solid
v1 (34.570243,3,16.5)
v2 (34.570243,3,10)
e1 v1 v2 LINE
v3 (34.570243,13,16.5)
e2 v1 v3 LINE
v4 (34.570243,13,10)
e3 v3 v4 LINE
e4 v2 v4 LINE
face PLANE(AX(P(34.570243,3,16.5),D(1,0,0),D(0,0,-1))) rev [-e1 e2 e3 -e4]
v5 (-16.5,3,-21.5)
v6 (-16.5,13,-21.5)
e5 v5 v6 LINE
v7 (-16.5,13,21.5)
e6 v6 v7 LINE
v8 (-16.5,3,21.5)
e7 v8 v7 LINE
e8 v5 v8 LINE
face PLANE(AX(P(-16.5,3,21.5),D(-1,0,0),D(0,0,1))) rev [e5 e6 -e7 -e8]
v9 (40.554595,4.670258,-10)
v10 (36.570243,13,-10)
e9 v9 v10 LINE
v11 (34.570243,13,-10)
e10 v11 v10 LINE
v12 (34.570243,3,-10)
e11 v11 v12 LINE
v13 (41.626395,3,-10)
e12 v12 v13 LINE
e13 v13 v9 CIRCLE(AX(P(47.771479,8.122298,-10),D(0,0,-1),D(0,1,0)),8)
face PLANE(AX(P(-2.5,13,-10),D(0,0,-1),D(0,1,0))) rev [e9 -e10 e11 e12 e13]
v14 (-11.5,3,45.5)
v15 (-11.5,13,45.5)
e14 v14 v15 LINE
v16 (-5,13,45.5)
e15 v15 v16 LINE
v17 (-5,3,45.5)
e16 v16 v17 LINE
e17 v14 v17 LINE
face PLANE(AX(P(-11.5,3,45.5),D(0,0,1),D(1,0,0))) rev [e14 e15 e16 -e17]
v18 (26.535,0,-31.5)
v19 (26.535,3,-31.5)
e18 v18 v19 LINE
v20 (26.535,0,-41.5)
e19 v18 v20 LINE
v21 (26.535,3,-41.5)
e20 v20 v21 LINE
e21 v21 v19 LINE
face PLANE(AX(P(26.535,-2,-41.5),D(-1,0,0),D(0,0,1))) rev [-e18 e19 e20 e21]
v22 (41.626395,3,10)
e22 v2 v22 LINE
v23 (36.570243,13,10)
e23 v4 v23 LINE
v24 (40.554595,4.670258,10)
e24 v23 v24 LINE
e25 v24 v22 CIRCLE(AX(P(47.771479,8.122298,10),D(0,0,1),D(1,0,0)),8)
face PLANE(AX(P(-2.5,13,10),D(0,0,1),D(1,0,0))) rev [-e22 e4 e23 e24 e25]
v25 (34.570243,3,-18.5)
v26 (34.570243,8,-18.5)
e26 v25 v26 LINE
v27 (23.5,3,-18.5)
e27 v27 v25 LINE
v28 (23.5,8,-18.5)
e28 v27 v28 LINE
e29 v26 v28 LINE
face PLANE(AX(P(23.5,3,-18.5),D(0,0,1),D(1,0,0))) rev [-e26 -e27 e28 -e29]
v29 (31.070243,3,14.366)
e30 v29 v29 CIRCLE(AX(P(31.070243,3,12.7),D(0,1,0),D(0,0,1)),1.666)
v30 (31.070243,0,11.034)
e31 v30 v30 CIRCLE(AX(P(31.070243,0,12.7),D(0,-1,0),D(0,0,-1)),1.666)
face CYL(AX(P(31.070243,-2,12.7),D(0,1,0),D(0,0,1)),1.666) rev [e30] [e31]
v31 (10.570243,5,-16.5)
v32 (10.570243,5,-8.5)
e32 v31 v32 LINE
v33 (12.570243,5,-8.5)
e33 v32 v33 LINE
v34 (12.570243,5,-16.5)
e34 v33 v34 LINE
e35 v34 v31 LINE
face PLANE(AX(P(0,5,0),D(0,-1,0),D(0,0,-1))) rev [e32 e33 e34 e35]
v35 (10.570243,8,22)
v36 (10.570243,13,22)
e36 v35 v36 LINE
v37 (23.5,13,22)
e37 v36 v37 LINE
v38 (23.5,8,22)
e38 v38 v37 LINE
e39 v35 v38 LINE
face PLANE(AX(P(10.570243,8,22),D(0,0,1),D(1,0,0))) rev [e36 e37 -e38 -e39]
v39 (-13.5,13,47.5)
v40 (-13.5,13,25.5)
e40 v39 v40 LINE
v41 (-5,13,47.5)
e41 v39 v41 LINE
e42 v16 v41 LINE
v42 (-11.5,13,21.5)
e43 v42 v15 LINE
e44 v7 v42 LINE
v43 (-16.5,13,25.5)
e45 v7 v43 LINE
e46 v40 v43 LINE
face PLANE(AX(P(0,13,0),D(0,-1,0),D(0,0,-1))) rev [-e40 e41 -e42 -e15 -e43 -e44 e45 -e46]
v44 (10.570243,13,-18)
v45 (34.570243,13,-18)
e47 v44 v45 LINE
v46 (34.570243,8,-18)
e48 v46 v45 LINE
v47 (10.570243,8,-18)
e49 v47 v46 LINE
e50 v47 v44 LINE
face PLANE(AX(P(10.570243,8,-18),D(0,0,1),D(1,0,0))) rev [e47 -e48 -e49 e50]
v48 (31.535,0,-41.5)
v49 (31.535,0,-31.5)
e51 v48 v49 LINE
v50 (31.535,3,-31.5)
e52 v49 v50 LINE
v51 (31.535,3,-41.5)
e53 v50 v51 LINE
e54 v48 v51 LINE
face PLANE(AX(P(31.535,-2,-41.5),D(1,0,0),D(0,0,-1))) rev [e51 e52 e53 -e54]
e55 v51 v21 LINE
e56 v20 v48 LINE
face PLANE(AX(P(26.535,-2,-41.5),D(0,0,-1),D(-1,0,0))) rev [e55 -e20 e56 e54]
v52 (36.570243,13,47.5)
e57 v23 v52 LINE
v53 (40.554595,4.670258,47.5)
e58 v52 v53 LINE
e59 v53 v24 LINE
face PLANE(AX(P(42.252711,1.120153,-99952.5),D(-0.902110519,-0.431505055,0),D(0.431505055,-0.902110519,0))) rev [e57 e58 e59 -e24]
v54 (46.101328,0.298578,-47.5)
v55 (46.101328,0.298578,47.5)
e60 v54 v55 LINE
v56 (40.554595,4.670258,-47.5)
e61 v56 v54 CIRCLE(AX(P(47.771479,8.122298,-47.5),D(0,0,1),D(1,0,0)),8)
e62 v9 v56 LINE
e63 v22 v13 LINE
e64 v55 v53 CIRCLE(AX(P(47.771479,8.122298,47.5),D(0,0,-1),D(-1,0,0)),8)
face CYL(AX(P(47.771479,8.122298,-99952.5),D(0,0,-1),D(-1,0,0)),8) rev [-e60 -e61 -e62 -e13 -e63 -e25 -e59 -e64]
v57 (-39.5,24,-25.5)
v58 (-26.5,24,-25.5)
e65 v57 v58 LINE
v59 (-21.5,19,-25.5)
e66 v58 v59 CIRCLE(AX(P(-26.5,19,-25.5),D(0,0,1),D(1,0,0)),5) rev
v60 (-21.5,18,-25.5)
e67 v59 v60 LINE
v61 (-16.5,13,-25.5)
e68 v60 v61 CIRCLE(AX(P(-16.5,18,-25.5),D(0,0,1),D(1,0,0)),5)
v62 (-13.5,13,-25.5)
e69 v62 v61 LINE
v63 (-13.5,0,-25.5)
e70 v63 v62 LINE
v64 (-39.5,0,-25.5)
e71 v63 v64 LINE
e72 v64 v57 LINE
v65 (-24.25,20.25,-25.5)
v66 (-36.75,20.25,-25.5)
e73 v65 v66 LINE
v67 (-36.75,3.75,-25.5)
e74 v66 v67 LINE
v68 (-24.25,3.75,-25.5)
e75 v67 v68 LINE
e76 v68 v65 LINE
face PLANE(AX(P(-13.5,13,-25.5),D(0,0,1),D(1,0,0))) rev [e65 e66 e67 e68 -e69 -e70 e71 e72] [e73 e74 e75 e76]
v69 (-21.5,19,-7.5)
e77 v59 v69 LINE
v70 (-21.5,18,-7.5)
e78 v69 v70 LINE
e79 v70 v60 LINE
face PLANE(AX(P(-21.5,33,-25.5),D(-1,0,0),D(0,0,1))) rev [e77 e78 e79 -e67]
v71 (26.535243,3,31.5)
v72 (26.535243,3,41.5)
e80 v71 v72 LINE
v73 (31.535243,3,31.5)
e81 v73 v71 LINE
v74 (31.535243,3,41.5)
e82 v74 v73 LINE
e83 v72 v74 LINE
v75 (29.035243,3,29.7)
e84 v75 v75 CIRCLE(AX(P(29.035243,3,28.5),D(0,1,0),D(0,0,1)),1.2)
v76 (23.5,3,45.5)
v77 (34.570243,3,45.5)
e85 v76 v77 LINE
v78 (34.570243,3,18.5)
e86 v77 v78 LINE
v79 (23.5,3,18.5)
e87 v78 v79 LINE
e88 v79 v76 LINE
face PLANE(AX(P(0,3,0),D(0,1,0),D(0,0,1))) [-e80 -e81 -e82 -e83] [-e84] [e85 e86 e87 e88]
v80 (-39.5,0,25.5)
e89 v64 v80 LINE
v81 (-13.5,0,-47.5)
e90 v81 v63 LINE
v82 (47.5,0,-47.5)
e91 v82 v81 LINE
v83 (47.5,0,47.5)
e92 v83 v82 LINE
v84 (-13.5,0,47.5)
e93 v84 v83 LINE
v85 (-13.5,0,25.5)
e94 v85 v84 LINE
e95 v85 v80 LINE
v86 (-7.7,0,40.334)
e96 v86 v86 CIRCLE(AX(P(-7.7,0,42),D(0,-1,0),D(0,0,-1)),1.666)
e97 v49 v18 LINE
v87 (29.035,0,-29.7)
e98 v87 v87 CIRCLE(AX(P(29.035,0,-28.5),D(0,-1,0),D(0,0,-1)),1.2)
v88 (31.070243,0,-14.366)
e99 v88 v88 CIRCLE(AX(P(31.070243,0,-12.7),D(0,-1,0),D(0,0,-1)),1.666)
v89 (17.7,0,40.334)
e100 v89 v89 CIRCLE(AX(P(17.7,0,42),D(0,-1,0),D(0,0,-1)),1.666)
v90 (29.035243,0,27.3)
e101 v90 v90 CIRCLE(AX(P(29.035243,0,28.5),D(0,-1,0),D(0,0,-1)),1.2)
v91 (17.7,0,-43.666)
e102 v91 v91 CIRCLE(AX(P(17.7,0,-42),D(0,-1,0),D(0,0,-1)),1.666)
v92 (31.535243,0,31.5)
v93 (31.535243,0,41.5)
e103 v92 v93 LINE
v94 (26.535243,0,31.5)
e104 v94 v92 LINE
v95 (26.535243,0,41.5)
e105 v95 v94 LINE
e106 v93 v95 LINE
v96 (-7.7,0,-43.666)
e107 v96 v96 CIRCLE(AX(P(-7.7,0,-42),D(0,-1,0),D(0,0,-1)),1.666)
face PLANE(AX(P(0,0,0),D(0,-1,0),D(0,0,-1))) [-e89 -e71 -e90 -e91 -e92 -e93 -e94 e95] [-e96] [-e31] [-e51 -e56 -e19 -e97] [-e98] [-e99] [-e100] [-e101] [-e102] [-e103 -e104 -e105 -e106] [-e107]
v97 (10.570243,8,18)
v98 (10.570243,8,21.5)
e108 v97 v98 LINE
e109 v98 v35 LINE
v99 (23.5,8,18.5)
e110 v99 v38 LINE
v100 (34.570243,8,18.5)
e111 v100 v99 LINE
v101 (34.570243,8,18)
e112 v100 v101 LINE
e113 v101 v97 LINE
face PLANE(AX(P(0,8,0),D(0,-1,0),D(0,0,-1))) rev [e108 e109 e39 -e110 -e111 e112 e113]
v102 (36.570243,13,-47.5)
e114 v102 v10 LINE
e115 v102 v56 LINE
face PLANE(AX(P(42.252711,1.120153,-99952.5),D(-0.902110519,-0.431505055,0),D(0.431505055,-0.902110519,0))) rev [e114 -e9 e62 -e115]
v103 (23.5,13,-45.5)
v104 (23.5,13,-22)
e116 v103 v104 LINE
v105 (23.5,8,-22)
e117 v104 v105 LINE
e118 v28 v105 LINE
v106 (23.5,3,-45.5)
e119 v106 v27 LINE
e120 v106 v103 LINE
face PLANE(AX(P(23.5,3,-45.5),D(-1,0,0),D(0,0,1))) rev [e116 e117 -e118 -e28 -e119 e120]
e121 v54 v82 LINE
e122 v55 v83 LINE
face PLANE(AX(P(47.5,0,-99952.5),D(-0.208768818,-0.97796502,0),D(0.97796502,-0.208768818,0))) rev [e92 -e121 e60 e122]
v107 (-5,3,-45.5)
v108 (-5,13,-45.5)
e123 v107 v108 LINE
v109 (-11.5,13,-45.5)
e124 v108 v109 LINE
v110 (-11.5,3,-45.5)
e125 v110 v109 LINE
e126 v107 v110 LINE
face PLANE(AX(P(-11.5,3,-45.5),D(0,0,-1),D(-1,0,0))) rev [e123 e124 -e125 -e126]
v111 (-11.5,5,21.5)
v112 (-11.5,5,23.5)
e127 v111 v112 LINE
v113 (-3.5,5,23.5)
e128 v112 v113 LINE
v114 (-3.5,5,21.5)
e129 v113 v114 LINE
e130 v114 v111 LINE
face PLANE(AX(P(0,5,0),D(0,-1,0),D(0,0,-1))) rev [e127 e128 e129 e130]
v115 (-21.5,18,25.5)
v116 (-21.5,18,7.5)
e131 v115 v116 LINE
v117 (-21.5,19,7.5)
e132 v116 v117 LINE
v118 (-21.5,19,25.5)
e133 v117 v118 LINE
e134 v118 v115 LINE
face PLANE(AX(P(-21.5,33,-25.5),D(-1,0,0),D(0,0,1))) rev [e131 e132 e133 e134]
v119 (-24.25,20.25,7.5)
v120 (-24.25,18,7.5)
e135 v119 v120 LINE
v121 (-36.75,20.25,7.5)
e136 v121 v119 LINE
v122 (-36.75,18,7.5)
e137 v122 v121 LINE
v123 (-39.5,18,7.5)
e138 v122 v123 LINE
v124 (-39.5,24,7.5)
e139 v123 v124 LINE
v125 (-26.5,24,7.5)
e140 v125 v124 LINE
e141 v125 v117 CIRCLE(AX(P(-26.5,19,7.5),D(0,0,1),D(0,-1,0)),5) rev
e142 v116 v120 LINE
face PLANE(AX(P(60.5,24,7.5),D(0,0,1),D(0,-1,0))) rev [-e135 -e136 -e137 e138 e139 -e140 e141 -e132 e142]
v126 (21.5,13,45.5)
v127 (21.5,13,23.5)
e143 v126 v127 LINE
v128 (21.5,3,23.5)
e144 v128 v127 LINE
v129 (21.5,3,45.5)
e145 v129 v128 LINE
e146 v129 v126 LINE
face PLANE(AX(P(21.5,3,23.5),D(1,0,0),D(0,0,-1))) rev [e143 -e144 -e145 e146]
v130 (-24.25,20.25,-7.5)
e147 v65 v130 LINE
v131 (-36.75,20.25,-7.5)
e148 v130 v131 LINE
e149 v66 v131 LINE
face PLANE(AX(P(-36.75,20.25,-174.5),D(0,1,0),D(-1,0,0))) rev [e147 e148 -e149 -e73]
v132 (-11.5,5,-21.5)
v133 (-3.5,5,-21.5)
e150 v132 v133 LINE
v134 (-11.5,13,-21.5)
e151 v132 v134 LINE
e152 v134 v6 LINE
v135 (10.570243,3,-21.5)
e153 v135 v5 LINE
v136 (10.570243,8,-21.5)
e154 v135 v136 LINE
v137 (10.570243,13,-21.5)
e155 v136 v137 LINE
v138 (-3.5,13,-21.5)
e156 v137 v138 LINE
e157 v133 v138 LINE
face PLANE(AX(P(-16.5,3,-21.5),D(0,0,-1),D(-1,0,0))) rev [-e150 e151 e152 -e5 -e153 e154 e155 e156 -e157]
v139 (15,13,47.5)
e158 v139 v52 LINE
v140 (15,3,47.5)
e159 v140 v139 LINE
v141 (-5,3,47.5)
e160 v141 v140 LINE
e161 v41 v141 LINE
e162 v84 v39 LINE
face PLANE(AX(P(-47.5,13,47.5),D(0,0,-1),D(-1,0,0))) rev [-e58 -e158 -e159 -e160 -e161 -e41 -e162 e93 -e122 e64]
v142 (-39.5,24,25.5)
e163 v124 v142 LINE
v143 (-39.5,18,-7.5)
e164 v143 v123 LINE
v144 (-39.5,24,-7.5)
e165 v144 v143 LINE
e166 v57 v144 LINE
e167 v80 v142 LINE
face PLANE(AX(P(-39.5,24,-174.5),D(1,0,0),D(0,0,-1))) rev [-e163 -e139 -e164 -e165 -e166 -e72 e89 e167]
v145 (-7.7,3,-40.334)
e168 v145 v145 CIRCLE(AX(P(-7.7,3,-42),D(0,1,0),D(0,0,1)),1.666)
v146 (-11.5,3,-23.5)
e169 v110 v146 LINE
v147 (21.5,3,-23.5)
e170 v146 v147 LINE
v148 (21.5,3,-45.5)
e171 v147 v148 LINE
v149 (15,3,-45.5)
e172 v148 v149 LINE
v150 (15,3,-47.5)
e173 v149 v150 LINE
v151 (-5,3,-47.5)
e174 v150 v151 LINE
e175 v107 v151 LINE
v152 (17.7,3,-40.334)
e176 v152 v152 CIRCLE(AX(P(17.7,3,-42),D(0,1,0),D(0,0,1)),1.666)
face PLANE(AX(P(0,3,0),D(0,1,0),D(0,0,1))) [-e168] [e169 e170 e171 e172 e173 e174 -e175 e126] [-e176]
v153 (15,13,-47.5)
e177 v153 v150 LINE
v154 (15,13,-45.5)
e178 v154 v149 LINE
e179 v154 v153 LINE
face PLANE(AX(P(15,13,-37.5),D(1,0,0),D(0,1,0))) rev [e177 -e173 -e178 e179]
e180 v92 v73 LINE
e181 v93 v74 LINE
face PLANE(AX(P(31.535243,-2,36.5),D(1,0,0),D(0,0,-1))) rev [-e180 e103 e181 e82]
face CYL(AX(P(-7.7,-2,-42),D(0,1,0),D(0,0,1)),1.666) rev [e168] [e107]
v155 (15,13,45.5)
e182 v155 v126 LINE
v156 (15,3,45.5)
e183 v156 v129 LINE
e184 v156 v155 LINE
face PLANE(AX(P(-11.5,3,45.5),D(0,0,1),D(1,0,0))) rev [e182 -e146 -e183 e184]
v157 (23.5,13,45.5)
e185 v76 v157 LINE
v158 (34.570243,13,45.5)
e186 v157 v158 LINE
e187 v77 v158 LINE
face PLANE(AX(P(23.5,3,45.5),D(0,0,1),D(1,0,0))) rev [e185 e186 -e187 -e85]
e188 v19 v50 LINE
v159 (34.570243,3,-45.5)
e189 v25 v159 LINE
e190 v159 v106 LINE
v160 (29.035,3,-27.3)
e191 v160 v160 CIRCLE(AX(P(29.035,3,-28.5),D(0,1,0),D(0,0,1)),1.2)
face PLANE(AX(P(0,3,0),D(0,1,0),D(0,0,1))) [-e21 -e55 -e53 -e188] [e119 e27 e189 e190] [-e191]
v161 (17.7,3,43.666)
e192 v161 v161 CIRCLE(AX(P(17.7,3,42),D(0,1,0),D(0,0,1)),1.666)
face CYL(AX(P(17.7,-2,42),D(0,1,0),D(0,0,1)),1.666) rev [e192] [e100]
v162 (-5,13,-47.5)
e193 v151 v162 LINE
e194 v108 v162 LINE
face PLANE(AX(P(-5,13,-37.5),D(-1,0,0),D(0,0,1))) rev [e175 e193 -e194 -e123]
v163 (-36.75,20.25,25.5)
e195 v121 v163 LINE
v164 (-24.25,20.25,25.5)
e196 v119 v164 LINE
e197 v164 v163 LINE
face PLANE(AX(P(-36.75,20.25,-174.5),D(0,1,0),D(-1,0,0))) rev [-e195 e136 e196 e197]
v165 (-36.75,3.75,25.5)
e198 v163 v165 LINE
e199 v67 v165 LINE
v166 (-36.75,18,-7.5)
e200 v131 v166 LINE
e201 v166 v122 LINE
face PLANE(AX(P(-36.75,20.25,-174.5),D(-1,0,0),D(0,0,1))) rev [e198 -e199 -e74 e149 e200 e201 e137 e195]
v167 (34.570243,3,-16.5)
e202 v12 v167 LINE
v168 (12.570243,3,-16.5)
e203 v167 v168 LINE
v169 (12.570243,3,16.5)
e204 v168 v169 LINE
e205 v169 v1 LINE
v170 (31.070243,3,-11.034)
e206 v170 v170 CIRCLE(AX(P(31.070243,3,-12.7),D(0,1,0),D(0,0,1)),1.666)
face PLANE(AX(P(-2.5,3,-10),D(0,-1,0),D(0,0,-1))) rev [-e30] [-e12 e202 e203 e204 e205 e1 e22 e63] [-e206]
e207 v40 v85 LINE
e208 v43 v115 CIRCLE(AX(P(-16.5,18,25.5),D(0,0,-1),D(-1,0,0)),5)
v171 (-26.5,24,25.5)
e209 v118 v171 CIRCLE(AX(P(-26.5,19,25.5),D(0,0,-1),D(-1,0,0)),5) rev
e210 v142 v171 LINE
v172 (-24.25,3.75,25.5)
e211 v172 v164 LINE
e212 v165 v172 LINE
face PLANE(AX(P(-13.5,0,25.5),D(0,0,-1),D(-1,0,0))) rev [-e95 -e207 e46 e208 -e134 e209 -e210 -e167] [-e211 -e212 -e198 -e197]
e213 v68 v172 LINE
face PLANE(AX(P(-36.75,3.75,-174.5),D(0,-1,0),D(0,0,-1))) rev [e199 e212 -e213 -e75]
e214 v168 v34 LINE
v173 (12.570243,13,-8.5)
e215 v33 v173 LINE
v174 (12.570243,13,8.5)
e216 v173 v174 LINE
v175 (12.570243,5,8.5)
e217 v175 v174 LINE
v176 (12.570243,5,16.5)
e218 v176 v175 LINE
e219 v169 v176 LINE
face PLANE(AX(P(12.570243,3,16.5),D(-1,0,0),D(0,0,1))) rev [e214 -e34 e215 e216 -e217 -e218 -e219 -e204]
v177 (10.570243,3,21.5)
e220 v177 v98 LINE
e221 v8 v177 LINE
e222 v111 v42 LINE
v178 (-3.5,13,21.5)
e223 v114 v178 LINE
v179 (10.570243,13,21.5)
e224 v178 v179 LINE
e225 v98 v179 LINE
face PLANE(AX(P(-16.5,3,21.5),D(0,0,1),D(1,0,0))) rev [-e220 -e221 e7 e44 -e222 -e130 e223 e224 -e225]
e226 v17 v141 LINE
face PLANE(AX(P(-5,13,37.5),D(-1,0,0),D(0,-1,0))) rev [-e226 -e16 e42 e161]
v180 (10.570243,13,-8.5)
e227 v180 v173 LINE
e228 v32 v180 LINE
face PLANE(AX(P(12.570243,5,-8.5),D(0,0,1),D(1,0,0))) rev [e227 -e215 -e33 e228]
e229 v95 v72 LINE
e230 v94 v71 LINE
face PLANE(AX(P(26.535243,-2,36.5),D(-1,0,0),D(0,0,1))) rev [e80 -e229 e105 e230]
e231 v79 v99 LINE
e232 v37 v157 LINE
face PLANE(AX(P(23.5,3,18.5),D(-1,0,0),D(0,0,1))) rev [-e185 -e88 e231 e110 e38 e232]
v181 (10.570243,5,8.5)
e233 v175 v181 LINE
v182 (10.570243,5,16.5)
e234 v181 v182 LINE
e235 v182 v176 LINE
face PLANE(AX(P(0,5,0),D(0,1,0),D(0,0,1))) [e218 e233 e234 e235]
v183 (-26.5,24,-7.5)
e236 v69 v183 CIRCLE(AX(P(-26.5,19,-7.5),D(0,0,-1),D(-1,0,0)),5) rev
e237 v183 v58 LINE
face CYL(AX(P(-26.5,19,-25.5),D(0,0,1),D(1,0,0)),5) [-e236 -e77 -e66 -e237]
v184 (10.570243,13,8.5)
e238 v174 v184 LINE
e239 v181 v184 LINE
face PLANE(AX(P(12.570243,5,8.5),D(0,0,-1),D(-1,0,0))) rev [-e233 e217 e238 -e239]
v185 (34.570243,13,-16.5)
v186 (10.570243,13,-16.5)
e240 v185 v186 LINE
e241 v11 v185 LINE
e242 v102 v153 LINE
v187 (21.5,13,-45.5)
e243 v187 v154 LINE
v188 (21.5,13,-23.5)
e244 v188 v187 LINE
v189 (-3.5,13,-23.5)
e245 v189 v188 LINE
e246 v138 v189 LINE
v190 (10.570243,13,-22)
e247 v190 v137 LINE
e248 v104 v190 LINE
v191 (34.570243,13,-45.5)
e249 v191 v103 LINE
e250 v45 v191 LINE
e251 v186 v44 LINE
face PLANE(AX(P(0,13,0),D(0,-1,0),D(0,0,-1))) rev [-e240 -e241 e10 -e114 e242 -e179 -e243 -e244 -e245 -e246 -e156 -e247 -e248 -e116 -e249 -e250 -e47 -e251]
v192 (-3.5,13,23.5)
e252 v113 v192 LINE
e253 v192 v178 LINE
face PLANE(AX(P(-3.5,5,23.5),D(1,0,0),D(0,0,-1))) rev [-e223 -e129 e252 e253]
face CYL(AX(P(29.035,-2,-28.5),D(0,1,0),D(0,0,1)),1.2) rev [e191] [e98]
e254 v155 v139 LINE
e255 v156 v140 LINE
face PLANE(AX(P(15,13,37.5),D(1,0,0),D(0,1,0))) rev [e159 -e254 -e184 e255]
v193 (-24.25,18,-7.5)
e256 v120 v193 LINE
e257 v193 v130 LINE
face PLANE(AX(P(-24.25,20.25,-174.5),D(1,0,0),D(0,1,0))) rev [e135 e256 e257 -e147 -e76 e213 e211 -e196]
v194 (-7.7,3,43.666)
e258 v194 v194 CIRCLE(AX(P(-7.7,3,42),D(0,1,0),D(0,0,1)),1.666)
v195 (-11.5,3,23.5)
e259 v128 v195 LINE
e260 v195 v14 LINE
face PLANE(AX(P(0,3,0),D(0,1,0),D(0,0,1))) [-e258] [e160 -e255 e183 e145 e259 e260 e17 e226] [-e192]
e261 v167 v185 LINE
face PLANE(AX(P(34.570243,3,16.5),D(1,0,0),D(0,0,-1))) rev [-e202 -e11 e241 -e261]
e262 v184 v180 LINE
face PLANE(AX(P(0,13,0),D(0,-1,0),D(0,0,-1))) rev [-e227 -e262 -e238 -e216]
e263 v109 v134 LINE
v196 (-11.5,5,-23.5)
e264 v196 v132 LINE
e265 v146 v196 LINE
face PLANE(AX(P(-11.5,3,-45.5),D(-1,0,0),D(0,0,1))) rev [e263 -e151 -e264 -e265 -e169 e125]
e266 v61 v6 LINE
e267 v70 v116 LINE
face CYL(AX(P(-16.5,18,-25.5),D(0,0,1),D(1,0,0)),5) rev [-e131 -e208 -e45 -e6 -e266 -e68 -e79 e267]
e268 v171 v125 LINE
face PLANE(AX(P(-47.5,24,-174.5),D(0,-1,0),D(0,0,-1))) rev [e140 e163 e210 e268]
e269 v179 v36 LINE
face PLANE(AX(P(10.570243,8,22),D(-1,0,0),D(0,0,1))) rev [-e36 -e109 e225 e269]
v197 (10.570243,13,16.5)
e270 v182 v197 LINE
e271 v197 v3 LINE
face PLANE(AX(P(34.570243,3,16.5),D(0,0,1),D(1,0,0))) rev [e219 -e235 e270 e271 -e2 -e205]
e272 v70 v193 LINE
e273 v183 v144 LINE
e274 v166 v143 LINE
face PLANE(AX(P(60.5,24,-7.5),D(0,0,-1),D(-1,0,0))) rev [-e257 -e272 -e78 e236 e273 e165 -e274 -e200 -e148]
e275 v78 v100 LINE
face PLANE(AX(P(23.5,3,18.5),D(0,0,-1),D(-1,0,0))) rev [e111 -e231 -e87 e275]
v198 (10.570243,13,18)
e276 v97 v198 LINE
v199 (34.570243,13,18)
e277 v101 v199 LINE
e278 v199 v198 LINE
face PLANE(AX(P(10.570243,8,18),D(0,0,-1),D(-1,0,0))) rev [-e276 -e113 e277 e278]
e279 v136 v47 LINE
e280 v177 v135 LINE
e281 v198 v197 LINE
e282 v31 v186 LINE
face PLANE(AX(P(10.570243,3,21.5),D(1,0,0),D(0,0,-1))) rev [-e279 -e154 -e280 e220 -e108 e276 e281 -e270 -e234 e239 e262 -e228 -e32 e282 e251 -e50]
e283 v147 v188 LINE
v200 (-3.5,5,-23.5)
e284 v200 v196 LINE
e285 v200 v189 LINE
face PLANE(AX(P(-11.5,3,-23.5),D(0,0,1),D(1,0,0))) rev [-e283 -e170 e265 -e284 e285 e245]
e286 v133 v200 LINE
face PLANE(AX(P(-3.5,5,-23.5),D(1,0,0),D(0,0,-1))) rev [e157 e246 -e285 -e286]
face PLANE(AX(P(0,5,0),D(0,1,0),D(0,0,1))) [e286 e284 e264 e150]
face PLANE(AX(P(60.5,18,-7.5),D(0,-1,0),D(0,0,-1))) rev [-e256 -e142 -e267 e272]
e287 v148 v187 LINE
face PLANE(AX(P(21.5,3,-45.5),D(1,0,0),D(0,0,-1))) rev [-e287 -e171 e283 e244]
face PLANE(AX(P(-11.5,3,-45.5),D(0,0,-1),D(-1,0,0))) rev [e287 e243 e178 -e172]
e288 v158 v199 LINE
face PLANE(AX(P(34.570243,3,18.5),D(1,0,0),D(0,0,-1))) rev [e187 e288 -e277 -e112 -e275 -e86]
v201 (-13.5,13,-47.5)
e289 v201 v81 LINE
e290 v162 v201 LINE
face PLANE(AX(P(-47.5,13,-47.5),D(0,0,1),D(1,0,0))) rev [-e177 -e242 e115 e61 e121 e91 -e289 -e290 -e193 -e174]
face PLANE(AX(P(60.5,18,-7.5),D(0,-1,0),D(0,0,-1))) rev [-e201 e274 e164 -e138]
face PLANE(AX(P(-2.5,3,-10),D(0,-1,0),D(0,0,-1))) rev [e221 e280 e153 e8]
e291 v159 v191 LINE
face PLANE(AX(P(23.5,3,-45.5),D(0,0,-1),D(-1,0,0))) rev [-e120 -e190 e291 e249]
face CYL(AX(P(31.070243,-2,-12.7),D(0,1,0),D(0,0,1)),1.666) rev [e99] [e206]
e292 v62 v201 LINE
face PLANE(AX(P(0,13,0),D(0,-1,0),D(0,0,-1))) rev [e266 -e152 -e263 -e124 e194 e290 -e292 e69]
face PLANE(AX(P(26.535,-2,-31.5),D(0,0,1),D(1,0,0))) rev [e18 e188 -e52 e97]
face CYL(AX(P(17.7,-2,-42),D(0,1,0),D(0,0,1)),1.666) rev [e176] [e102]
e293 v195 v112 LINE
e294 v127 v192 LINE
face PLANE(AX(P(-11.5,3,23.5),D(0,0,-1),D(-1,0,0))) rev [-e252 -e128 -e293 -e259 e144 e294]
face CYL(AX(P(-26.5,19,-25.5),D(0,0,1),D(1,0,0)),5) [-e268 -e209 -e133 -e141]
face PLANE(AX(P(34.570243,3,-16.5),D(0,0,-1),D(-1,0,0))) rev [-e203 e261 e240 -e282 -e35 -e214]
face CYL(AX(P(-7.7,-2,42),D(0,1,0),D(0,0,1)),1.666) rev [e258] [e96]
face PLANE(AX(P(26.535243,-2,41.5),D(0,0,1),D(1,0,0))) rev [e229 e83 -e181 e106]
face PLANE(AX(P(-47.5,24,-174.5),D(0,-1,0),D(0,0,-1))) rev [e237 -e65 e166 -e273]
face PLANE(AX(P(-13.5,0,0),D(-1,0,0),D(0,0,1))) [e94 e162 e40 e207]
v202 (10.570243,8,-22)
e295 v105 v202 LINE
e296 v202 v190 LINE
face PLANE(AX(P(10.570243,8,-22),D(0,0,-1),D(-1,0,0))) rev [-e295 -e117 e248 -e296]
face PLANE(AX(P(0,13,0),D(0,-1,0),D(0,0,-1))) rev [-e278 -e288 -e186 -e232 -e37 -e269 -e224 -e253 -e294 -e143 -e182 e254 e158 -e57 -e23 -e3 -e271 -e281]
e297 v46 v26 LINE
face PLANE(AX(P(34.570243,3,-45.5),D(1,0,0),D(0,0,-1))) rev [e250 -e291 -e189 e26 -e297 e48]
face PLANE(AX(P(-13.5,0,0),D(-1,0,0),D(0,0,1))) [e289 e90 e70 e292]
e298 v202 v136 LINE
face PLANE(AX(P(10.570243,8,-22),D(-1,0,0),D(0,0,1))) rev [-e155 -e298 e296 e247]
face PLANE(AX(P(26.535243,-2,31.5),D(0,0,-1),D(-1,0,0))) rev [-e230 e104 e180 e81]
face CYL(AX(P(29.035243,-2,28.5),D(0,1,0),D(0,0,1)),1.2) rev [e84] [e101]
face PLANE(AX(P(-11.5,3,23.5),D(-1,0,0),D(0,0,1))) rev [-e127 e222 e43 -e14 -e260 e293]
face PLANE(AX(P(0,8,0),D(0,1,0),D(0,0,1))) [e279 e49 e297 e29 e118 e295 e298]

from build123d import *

# Parameters (mm, degrees)
SKETCH1_W           = 95
SKETCH1_H           = 95
BOSS_EXTRUDE2_DEPTH = 13
SKETCH2_W           = 22
SKETCH2_H           = 13
CUT_EXTRUDE1_DEPTH  = 34
SKETCH3_W           = 22
SKETCH3_H           = 13
CUT_EXTRUDE2_DEPTH  = 34
SKETCH5_W           = 26
SKETCH5_H           = 51
BOSS_EXTRUDE3_DEPTH = 20
SKETCH6_W           = 12
SKETCH6_H           = 16
CUT_EXTRUDE4_DEPTH  = 200
SKETCH7_W           = 26
SKETCH7_H           = 9
CUT_EXTRUDE5_DEPTH  = 200
FILLET2_R           = 5
SKETCH8_W           = 8
SKETCH8_H           = 24
CUT_EXTRUDE6_DEPTH  = 200
SKETCH9_W           = 33
SKETCH9_H           = 22
CUT_EXTRUDE7_DEPTH  = 10
SKETCH10_W          = 20
SKETCH10_H          = 10
CUT_EXTRUDE10_DEPTH = 10
SKETCH13_W          = 33
SKETCH13_H          = 22
CUT_EXTRUDE11_DEPTH = 10
SKETCH14_W          = 20
SKETCH14_H          = 10
CUT_EXTRUDE12_DEPTH = 10
SKETCH18_W          = 20
SKETCH18_H          = 10
CUT_EXTRUDE16_DEPTH = 50
CUT_EXTRUDE17_DEPTH = 100000
SKETCH20_W          = 22
SKETCH20_H          = 33
CUT_EXTRUDE18_DEPTH = 10
SKETCH21_W          = 27.070242808
SKETCH21_H          = 43
CUT_EXTRUDE19_DEPTH = 10
SKETCH22_W          = 2
SKETCH22_H          = 20
BOSS_EXTRUDE4_DEPTH = 10
SKETCH23_W          = 12.5
SKETCH23_H          = 16.5
CUT_EXTRUDE20_DEPTH = 200
SKETCH24_W          = 8
SKETCH24_H          = 2
CUT_EXTRUDE21_DEPTH = 8
SKETCH25_W          = 8
SKETCH25_H          = 2
CUT_EXTRUDE22_DEPTH = 8
SKETCH26_W          = 2
SKETCH26_H          = 8
CUT_EXTRUDE24_DEPTH = 8
SKETCH27_W          = 2
SKETCH27_H          = 8
CUT_EXTRUDE25_DEPTH = 8
SKETCH28_W          = 11.070242808
SKETCH28_H          = 27
CUT_EXTRUDE26_DEPTH = 10
SKETCH29_W          = 11.070242808
SKETCH29_H          = 27
CUT_EXTRUDE27_DEPTH = 10
SKETCH30_W          = 24
SKETCH30_H          = 4
CUT_EXTRUDE29_DEPTH = 5
SKETCH31_W          = 24
SKETCH31_H          = 4
CUT_EXTRUDE30_DEPTH = 5
SKETCH32_W          = 5
SKETCH32_H          = 5
CUT_EXTRUDE32_DEPTH = 5
SKETCH40_W          = 5
SKETCH40_H          = 10
CUT_EXTRUDE39_DEPTH = 5
SKETCH41_R          = 1.2
CUT_EXTRUDE40_DEPTH = 5
SKETCH42_W          = 5
SKETCH42_H          = 5
CUT_EXTRUDE41_DEPTH = 5
SKETCH43_R          = 1.2
CUT_EXTRUDE42_DEPTH = 5
SKETCH44_R          = 1.666
CUT_EXTRUDE43_DEPTH = 5
SKETCH45_R          = 1.666
CUT_EXTRUDE44_DEPTH = 5
SKETCH46_R          = 1.666
CUT_EXTRUDE45_DEPTH = 5
FILLET6_R           = 8
SKETCH47_W          = 15
SKETCH47_H          = 6
CUT_EXTRUDE46_DEPTH = 100


with BuildPart() as part:
    # Sketch1 → Boss-Extrude2 (new body)
    with BuildSketch(Plane(origin=(0, 0, 0), x_dir=(1, 0, 0), z_dir=(0, 1, 0))):
        Rectangle(SKETCH1_W, SKETCH1_H)
    extrude(amount=BOSS_EXTRUDE2_DEPTH)

    # Sketch2 → Cut-Extrude1 (cut)
    with BuildSketch(Plane.ZY.offset(47.5)):
        with Locations((36.5, 6.5)):
            Rectangle(SKETCH2_W, SKETCH2_H)
    extrude(amount=-CUT_EXTRUDE1_DEPTH, mode=Mode.SUBTRACT)

    # Sketch3 → Cut-Extrude2 (cut)
    with BuildSketch(Plane.ZY.offset(47.5)):
        with Locations((-36.5, 6.5)):
            Rectangle(SKETCH3_W, SKETCH3_H)
    extrude(amount=-CUT_EXTRUDE2_DEPTH, mode=Mode.SUBTRACT)

    # Sketch5 → Boss-Extrude3 (add)
    with BuildSketch(Plane(origin=(0, 13, 0), x_dir=(1, 0, 0), z_dir=(0, 1, 0))):
        with Locations((-34.5, 0)):
            Rectangle(SKETCH5_W, SKETCH5_H)
    extrude(amount=BOSS_EXTRUDE3_DEPTH)

    # Sketch6 → Cut-Extrude4 (cut)
    with BuildSketch(Plane.XY.offset(25.5)):
        with Locations((-30.5, 12)):
            Rectangle(SKETCH6_W, SKETCH6_H)
    extrude(amount=-CUT_EXTRUDE4_DEPTH, mode=Mode.SUBTRACT)

    # Sketch7 → Cut-Extrude5 (cut)
    with BuildSketch(Plane.XY.offset(25.5)):
        with Locations((-34.5, 28.5)):
            Rectangle(SKETCH7_W, SKETCH7_H)
    extrude(amount=-CUT_EXTRUDE5_DEPTH, mode=Mode.SUBTRACT)

    # Fillet2
    fillet2_edges = [part.edges().sort_by_distance(p)[0] for p in [
        (-21.5, 24, 0),
        (-21.5, 13, 0),
    ]]
    fillet(fillet2_edges, radius=FILLET2_R)

    # Sketch8 → Cut-Extrude6 (cut)
    with BuildSketch(Plane.XY.offset(25.5)):
        with Locations((-43.5, 12)):
            Rectangle(SKETCH8_W, SKETCH8_H)
    extrude(amount=-CUT_EXTRUDE6_DEPTH, mode=Mode.SUBTRACT)

    # Sketch9 → Cut-Extrude7 (cut)
    with BuildSketch(Plane(origin=(0, 13, 0), x_dir=(1, 0, 0), z_dir=(0, 1, 0))):
        with Locations((5, -34.5)):
            Rectangle(SKETCH9_W, SKETCH9_H)
    extrude(amount=-CUT_EXTRUDE7_DEPTH, mode=Mode.SUBTRACT)

    # Sketch10 → Cut-Extrude10 (cut)
    with BuildSketch(Plane.XY.offset(47.5)):
        with Locations((5, 8)):
            Rectangle(SKETCH10_W, SKETCH10_H)
    extrude(amount=-CUT_EXTRUDE10_DEPTH, mode=Mode.SUBTRACT)

    # Sketch13 → Cut-Extrude11 (cut)
    with BuildSketch(Plane(origin=(0, 13, 0), x_dir=(1, 0, 0), z_dir=(0, 1, 0))):
        with Locations((5, 34.5)):
            Rectangle(SKETCH13_W, SKETCH13_H)
    extrude(amount=-CUT_EXTRUDE11_DEPTH, mode=Mode.SUBTRACT)

    # Sketch14 → Cut-Extrude12 (cut)
    with BuildSketch(Plane(origin=(0, 0, -47.5), x_dir=(-1, 0, 0), z_dir=(0, 0, -1))):
        with Locations((-5, 8)):
            Rectangle(SKETCH14_W, SKETCH14_H)
    extrude(amount=-CUT_EXTRUDE12_DEPTH, mode=Mode.SUBTRACT)

    # Sketch18 → Cut-Extrude16 (cut)
    with BuildSketch(Plane(origin=(47.5, 0, 0), x_dir=(0, 0, -1), z_dir=(1, 0, 0))):
        with Locations((0, 8)):
            Rectangle(SKETCH18_W, SKETCH18_H)
    extrude(amount=-CUT_EXTRUDE16_DEPTH, mode=Mode.SUBTRACT)

    # Sketch19 → Cut-Extrude17 (cut)
    with BuildSketch(Plane.XY.offset(47.5)):
        Polygon((47.5, 0), (42.252710702, 1.120152934), (36.570242808, 13), (47.5, 13), align=None)
    extrude(amount=-CUT_EXTRUDE17_DEPTH, mode=Mode.SUBTRACT)

    # Sketch20 → Cut-Extrude18 (cut)
    with BuildSketch(Plane(origin=(0, 13, 0), x_dir=(1, 0, 0), z_dir=(0, 1, 0))):
        with Locations((23.570242808, 0)):
            Rectangle(SKETCH20_W, SKETCH20_H)
    extrude(amount=-CUT_EXTRUDE18_DEPTH, mode=Mode.SUBTRACT)

    # Sketch21 → Cut-Extrude19 (cut)
    with BuildSketch(Plane(origin=(0, 13, 0), x_dir=(1, 0, 0), z_dir=(0, 1, 0))):
        with Locations((-2.964878596, 0)):
            Rectangle(SKETCH21_W, SKETCH21_H)
    extrude(amount=-CUT_EXTRUDE19_DEPTH, mode=Mode.SUBTRACT)

    # Sketch22 → Boss-Extrude4 (add)
    with BuildSketch(Plane(origin=(0, 3, 0), x_dir=(1, 0, 0), z_dir=(0, 1, 0))):
        with Locations((11.570242808, 0)):
            Rectangle(SKETCH22_W, SKETCH22_H)
    extrude(amount=BOSS_EXTRUDE4_DEPTH)

    # Sketch23 → Cut-Extrude20 (cut)
    with BuildSketch(Plane.XY.offset(25.5)):
        with Locations((-30.5, 12)):
            Rectangle(SKETCH23_W, SKETCH23_H)
    extrude(amount=-CUT_EXTRUDE20_DEPTH, mode=Mode.SUBTRACT)

    # Sketch24 → Cut-Extrude21 (cut)
    with BuildSketch(Plane(origin=(0, 13, 0), x_dir=(1, 0, 0), z_dir=(0, 1, 0))):
        with Locations((-7.5, -22.5)):
            Rectangle(SKETCH24_W, SKETCH24_H)
    extrude(amount=-CUT_EXTRUDE21_DEPTH, mode=Mode.SUBTRACT)

    # Sketch25 → Cut-Extrude22 (cut)
    with BuildSketch(Plane(origin=(0, 13, 0), x_dir=(1, 0, 0), z_dir=(0, 1, 0))):
        with Locations((-7.5, 22.5)):
            Rectangle(SKETCH25_W, SKETCH25_H)
    extrude(amount=-CUT_EXTRUDE22_DEPTH, mode=Mode.SUBTRACT)

    # Sketch26 → Cut-Extrude24 (cut)
    with BuildSketch(Plane(origin=(0, 13, 0), x_dir=(1, 0, 0), z_dir=(0, 1, 0))):
        with Locations((11.570242808, -12.5)):
            Rectangle(SKETCH26_W, SKETCH26_H)
    extrude(amount=-CUT_EXTRUDE24_DEPTH, mode=Mode.SUBTRACT)

    # Sketch27 → Cut-Extrude25 (cut)
    with BuildSketch(Plane(origin=(0, 13, 0), x_dir=(1, 0, 0), z_dir=(0, 1, 0))):
        with Locations((11.570242808, 12.5)):
            Rectangle(SKETCH27_W, SKETCH27_H)
    extrude(amount=-CUT_EXTRUDE25_DEPTH, mode=Mode.SUBTRACT)

    # Sketch28 → Cut-Extrude26 (cut)
    with BuildSketch(Plane(origin=(0, 13, 0), x_dir=(1, 0, 0), z_dir=(0, 1, 0))):
        with Locations((29.035121404, -32)):
            Rectangle(SKETCH28_W, SKETCH28_H)
    extrude(amount=-CUT_EXTRUDE26_DEPTH, mode=Mode.SUBTRACT)

    # Sketch29 → Cut-Extrude27 (cut)
    with BuildSketch(Plane(origin=(0, 13, 0), x_dir=(1, 0, 0), z_dir=(0, 1, 0))):
        with Locations((29.035121404, 32)):
            Rectangle(SKETCH29_W, SKETCH29_H)
    extrude(amount=-CUT_EXTRUDE27_DEPTH, mode=Mode.SUBTRACT)

    # Sketch30 → Cut-Extrude29 (cut)
    with BuildSketch(Plane(origin=(0, 13, 0), x_dir=(1, 0, 0), z_dir=(0, 1, 0))):
        with Locations((22.570242808, -20)):
            Rectangle(SKETCH30_W, SKETCH30_H)
    extrude(amount=-CUT_EXTRUDE29_DEPTH, mode=Mode.SUBTRACT)

    # Sketch31 → Cut-Extrude30 (cut)
    with BuildSketch(Plane(origin=(0, 13, 0), x_dir=(1, 0, 0), z_dir=(0, 1, 0))):
        with Locations((22.570242808, 20)):
            Rectangle(SKETCH31_W, SKETCH31_H)
    extrude(amount=-CUT_EXTRUDE30_DEPTH, mode=Mode.SUBTRACT)

    # Sketch32 → Cut-Extrude32 (cut)
    with BuildSketch(Plane(origin=(0, 3, 0), x_dir=(1, 0, 0), z_dir=(0, 1, 0))):
        with Locations((29.035242808, -39)):
            Rectangle(SKETCH32_W, SKETCH32_H)
    extrude(amount=-CUT_EXTRUDE32_DEPTH, mode=Mode.SUBTRACT)

    # Sketch40 → Cut-Extrude39 (cut)
    with BuildSketch(Plane(origin=(0, 3, 0), x_dir=(1, 0, 0), z_dir=(0, 1, 0))):
        with Locations((29.035, 36.5)):
            Rectangle(SKETCH40_W, SKETCH40_H)
    extrude(amount=-CUT_EXTRUDE39_DEPTH, mode=Mode.SUBTRACT)

    # Sketch41 → Cut-Extrude40 (cut)
    with BuildSketch(Plane(origin=(0, 3, 0), x_dir=(1, 0, 0), z_dir=(0, 1, 0))):
        with Locations(Location((29.035, 28.5, 0), (0, 0, 270))):
            Circle(SKETCH41_R)
    extrude(amount=-CUT_EXTRUDE40_DEPTH, mode=Mode.SUBTRACT)

    # Sketch42 → Cut-Extrude41 (cut)
    with BuildSketch(Plane(origin=(0, 3, 0), x_dir=(1, 0, 0), z_dir=(0, 1, 0))):
        with Locations((29.035242808, -34)):
            Rectangle(SKETCH42_W, SKETCH42_H)
    extrude(amount=-CUT_EXTRUDE41_DEPTH, mode=Mode.SUBTRACT)

    # Sketch43 → Cut-Extrude42 (cut)
    with BuildSketch(Plane(origin=(0, 3, 0), x_dir=(1, 0, 0), z_dir=(0, 1, 0))):
        with Locations(Location((29.035242808, -28.5, 0), (0, 0, 270))):
            Circle(SKETCH43_R)
    extrude(amount=-CUT_EXTRUDE42_DEPTH, mode=Mode.SUBTRACT)

    # Sketch44 → Cut-Extrude43 (cut)
    with BuildSketch(Plane(origin=(0, 3, 0), x_dir=(1, 0, 0), z_dir=(0, 1, 0))):
        with Locations(Location((-7.7, 42, 0), (0, 0, 270))):
            Circle(SKETCH44_R)
        with Locations(Location((17.7, 42, 0), (0, 0, 270))):
            Circle(SKETCH44_R)
    extrude(amount=-CUT_EXTRUDE43_DEPTH, mode=Mode.SUBTRACT)

    # Sketch45 → Cut-Extrude44 (cut)
    with BuildSketch(Plane(origin=(0, 3, 0), x_dir=(1, 0, 0), z_dir=(0, 1, 0))):
        with Locations(Location((-7.7, -42, 0), (0, 0, 270))):
            Circle(SKETCH45_R)
        with Locations(Location((17.7, -42, 0), (0, 0, 270))):
            Circle(SKETCH45_R)
    extrude(amount=-CUT_EXTRUDE44_DEPTH, mode=Mode.SUBTRACT)

    # Sketch46 → Cut-Extrude45 (cut)
    with BuildSketch(Plane(origin=(0, 3, 0), x_dir=(1, 0, 0), z_dir=(0, 1, 0))):
        with Locations(Location((31.070242808, -12.7, 0), (0, 0, 270))):
            Circle(SKETCH46_R)
        with Locations(Location((31.070242808, 12.7, 0), (0, 0, 270))):
            Circle(SKETCH46_R)
    extrude(amount=-CUT_EXTRUDE45_DEPTH, mode=Mode.SUBTRACT)

    # Fillet6
    # the kernel refuses this fillet: 8 mm, written as the material it adds along each edge
    with BuildSketch(Plane(origin=(42.252710702, 1.120152934, 47.5), x_dir=(-0.4315050547709999, 0.902110518565811, 0), z_dir=(0, 0, -1))) as fillet6_piece_1_section:
        with BuildLine():
            CenterArc((FILLET6_R * 0.491916580905, FILLET6_R), FILLET6_R, 217.613324298, 52.386675702)
            Line((-FILLET6_R * 0.300231150017, FILLET6_R * 0.389670603367), (0, 0))
            Line((0, 0), (FILLET6_R * 0.491916580905, 0))
        make_face()
    fillet6_piece_1 = extrude(amount=95, mode=Mode.PRIVATE)
    fillet6_piece_1 = split(fillet6_piece_1, bisect_by=Plane(origin=(40.996343353, 3.680803438, 10), z_dir=(0, 0, 1)), keep=Keep.TOP, mode=Mode.PRIVATE)
    fillet6_piece_1 = split(fillet6_piece_1, bisect_by=Plane(origin=(40.996343353, 3, 28.75), z_dir=(0, 1, 0)), keep=Keep.TOP, mode=Mode.PRIVATE)
    add(fillet6_piece_1)
    with BuildSketch(Plane(origin=(42.252710702, 1.120152934, 47.5), x_dir=(-0.4315050547709999, 0.902110518565811, 0), z_dir=(0, 0, -1))) as fillet6_piece_2_section:
        with BuildLine():
            CenterArc((FILLET6_R * 0.491916580905, FILLET6_R), FILLET6_R, 217.613324298, 52.386675702)
            Line((-FILLET6_R * 0.300231150017, FILLET6_R * 0.389670603367), (0, 0))
            Line((0, 0), (FILLET6_R * 0.491916580905, 0))
        make_face()
    fillet6_piece_2 = extrude(amount=95, mode=Mode.PRIVATE)
    fillet6_piece_2 = split(fillet6_piece_2, bisect_by=Plane(origin=(42.958701315, 1.423679354, 10), z_dir=(0, 0, 1)), keep=Keep.TOP, mode=Mode.PRIVATE)
    fillet6_piece_2 = split(fillet6_piece_2, bisect_by=Plane(origin=(42.958701315, 3, 28.75), z_dir=(0, -1, 0)), keep=Keep.TOP, mode=Mode.PRIVATE)
    add(fillet6_piece_2)
    with BuildSketch(Plane(origin=(42.252710702, 1.120152934, 47.5), x_dir=(-0.4315050547709999, 0.902110518565811, 0), z_dir=(0, 0, -1))) as fillet6_piece_3_section:
        with BuildLine():
            CenterArc((FILLET6_R * 0.491916580905, FILLET6_R), FILLET6_R, 217.613324298, 52.386675702)
            Line((-FILLET6_R * 0.300231150017, FILLET6_R * 0.389670603367), (0, 0))
            Line((0, 0), (FILLET6_R * 0.491916580905, 0))
        make_face()
    fillet6_piece_3 = extrude(amount=95, mode=Mode.PRIVATE)
    fillet6_piece_3 = split(fillet6_piece_3, bisect_by=Plane(origin=(42.958701315, 1.423679354, 10), z_dir=(0, 0, -1)), keep=Keep.TOP, mode=Mode.PRIVATE)
    fillet6_piece_3 = split(fillet6_piece_3, bisect_by=Plane(origin=(42.958701315, 3, 0), z_dir=(0, -1, 0)), keep=Keep.TOP, mode=Mode.PRIVATE)
    fillet6_piece_3 = split(fillet6_piece_3, bisect_by=Plane(origin=(42.958701315, 1.423679354, -10), z_dir=(0, 0, 1)), keep=Keep.TOP, mode=Mode.PRIVATE)
    add(fillet6_piece_3)
    with BuildSketch(Plane(origin=(42.252710702, 1.120152934, 47.5), x_dir=(-0.4315050547709999, 0.902110518565811, 0), z_dir=(0, 0, -1))) as fillet6_piece_4_section:
        with BuildLine():
            CenterArc((FILLET6_R * 0.491916580905, FILLET6_R), FILLET6_R, 217.613324298, 52.386675702)
            Line((-FILLET6_R * 0.300231150017, FILLET6_R * 0.389670603367), (0, 0))
            Line((0, 0), (FILLET6_R * 0.491916580905, 0))
        make_face()
    fillet6_piece_4 = extrude(amount=95, mode=Mode.PRIVATE)
    fillet6_piece_4 = split(fillet6_piece_4, bisect_by=Plane(origin=(40.996343353, 3, -28.75), z_dir=(0, 1, 0)), keep=Keep.TOP, mode=Mode.PRIVATE)
    fillet6_piece_4 = split(fillet6_piece_4, bisect_by=Plane(origin=(40.996343353, 3.680803438, -10), z_dir=(0, 0, -1)), keep=Keep.TOP, mode=Mode.PRIVATE)
    add(fillet6_piece_4)
    with BuildSketch(Plane(origin=(42.252710702, 1.120152934, 47.5), x_dir=(-0.4315050547709999, 0.902110518565811, 0), z_dir=(0, 0, -1))) as fillet6_piece_5_section:
        with BuildLine():
            CenterArc((FILLET6_R * 0.491916580905, FILLET6_R), FILLET6_R, 217.613324298, 52.386675702)
            Line((-FILLET6_R * 0.300231150017, FILLET6_R * 0.389670603367), (0, 0))
            Line((0, 0), (FILLET6_R * 0.491916580905, 0))
        make_face()
    fillet6_piece_5 = extrude(amount=95, mode=Mode.PRIVATE)
    fillet6_piece_5 = split(fillet6_piece_5, bisect_by=Plane(origin=(42.958701315, 3, -28.75), z_dir=(0, -1, 0)), keep=Keep.TOP, mode=Mode.PRIVATE)
    fillet6_piece_5 = split(fillet6_piece_5, bisect_by=Plane(origin=(42.958701315, 1.423679354, -10), z_dir=(0, 0, -1)), keep=Keep.TOP, mode=Mode.PRIVATE)
    add(fillet6_piece_5)

    # Sketch47 → Cut-Extrude46 (cut)
    with BuildSketch(Plane.ZY.offset(39.5)):
        with Locations((0, 21)):
            Rectangle(SKETCH47_W, SKETCH47_H)
    extrude(amount=-CUT_EXTRUDE46_DEPTH, mode=Mode.SUBTRACT)


solid = part.part
